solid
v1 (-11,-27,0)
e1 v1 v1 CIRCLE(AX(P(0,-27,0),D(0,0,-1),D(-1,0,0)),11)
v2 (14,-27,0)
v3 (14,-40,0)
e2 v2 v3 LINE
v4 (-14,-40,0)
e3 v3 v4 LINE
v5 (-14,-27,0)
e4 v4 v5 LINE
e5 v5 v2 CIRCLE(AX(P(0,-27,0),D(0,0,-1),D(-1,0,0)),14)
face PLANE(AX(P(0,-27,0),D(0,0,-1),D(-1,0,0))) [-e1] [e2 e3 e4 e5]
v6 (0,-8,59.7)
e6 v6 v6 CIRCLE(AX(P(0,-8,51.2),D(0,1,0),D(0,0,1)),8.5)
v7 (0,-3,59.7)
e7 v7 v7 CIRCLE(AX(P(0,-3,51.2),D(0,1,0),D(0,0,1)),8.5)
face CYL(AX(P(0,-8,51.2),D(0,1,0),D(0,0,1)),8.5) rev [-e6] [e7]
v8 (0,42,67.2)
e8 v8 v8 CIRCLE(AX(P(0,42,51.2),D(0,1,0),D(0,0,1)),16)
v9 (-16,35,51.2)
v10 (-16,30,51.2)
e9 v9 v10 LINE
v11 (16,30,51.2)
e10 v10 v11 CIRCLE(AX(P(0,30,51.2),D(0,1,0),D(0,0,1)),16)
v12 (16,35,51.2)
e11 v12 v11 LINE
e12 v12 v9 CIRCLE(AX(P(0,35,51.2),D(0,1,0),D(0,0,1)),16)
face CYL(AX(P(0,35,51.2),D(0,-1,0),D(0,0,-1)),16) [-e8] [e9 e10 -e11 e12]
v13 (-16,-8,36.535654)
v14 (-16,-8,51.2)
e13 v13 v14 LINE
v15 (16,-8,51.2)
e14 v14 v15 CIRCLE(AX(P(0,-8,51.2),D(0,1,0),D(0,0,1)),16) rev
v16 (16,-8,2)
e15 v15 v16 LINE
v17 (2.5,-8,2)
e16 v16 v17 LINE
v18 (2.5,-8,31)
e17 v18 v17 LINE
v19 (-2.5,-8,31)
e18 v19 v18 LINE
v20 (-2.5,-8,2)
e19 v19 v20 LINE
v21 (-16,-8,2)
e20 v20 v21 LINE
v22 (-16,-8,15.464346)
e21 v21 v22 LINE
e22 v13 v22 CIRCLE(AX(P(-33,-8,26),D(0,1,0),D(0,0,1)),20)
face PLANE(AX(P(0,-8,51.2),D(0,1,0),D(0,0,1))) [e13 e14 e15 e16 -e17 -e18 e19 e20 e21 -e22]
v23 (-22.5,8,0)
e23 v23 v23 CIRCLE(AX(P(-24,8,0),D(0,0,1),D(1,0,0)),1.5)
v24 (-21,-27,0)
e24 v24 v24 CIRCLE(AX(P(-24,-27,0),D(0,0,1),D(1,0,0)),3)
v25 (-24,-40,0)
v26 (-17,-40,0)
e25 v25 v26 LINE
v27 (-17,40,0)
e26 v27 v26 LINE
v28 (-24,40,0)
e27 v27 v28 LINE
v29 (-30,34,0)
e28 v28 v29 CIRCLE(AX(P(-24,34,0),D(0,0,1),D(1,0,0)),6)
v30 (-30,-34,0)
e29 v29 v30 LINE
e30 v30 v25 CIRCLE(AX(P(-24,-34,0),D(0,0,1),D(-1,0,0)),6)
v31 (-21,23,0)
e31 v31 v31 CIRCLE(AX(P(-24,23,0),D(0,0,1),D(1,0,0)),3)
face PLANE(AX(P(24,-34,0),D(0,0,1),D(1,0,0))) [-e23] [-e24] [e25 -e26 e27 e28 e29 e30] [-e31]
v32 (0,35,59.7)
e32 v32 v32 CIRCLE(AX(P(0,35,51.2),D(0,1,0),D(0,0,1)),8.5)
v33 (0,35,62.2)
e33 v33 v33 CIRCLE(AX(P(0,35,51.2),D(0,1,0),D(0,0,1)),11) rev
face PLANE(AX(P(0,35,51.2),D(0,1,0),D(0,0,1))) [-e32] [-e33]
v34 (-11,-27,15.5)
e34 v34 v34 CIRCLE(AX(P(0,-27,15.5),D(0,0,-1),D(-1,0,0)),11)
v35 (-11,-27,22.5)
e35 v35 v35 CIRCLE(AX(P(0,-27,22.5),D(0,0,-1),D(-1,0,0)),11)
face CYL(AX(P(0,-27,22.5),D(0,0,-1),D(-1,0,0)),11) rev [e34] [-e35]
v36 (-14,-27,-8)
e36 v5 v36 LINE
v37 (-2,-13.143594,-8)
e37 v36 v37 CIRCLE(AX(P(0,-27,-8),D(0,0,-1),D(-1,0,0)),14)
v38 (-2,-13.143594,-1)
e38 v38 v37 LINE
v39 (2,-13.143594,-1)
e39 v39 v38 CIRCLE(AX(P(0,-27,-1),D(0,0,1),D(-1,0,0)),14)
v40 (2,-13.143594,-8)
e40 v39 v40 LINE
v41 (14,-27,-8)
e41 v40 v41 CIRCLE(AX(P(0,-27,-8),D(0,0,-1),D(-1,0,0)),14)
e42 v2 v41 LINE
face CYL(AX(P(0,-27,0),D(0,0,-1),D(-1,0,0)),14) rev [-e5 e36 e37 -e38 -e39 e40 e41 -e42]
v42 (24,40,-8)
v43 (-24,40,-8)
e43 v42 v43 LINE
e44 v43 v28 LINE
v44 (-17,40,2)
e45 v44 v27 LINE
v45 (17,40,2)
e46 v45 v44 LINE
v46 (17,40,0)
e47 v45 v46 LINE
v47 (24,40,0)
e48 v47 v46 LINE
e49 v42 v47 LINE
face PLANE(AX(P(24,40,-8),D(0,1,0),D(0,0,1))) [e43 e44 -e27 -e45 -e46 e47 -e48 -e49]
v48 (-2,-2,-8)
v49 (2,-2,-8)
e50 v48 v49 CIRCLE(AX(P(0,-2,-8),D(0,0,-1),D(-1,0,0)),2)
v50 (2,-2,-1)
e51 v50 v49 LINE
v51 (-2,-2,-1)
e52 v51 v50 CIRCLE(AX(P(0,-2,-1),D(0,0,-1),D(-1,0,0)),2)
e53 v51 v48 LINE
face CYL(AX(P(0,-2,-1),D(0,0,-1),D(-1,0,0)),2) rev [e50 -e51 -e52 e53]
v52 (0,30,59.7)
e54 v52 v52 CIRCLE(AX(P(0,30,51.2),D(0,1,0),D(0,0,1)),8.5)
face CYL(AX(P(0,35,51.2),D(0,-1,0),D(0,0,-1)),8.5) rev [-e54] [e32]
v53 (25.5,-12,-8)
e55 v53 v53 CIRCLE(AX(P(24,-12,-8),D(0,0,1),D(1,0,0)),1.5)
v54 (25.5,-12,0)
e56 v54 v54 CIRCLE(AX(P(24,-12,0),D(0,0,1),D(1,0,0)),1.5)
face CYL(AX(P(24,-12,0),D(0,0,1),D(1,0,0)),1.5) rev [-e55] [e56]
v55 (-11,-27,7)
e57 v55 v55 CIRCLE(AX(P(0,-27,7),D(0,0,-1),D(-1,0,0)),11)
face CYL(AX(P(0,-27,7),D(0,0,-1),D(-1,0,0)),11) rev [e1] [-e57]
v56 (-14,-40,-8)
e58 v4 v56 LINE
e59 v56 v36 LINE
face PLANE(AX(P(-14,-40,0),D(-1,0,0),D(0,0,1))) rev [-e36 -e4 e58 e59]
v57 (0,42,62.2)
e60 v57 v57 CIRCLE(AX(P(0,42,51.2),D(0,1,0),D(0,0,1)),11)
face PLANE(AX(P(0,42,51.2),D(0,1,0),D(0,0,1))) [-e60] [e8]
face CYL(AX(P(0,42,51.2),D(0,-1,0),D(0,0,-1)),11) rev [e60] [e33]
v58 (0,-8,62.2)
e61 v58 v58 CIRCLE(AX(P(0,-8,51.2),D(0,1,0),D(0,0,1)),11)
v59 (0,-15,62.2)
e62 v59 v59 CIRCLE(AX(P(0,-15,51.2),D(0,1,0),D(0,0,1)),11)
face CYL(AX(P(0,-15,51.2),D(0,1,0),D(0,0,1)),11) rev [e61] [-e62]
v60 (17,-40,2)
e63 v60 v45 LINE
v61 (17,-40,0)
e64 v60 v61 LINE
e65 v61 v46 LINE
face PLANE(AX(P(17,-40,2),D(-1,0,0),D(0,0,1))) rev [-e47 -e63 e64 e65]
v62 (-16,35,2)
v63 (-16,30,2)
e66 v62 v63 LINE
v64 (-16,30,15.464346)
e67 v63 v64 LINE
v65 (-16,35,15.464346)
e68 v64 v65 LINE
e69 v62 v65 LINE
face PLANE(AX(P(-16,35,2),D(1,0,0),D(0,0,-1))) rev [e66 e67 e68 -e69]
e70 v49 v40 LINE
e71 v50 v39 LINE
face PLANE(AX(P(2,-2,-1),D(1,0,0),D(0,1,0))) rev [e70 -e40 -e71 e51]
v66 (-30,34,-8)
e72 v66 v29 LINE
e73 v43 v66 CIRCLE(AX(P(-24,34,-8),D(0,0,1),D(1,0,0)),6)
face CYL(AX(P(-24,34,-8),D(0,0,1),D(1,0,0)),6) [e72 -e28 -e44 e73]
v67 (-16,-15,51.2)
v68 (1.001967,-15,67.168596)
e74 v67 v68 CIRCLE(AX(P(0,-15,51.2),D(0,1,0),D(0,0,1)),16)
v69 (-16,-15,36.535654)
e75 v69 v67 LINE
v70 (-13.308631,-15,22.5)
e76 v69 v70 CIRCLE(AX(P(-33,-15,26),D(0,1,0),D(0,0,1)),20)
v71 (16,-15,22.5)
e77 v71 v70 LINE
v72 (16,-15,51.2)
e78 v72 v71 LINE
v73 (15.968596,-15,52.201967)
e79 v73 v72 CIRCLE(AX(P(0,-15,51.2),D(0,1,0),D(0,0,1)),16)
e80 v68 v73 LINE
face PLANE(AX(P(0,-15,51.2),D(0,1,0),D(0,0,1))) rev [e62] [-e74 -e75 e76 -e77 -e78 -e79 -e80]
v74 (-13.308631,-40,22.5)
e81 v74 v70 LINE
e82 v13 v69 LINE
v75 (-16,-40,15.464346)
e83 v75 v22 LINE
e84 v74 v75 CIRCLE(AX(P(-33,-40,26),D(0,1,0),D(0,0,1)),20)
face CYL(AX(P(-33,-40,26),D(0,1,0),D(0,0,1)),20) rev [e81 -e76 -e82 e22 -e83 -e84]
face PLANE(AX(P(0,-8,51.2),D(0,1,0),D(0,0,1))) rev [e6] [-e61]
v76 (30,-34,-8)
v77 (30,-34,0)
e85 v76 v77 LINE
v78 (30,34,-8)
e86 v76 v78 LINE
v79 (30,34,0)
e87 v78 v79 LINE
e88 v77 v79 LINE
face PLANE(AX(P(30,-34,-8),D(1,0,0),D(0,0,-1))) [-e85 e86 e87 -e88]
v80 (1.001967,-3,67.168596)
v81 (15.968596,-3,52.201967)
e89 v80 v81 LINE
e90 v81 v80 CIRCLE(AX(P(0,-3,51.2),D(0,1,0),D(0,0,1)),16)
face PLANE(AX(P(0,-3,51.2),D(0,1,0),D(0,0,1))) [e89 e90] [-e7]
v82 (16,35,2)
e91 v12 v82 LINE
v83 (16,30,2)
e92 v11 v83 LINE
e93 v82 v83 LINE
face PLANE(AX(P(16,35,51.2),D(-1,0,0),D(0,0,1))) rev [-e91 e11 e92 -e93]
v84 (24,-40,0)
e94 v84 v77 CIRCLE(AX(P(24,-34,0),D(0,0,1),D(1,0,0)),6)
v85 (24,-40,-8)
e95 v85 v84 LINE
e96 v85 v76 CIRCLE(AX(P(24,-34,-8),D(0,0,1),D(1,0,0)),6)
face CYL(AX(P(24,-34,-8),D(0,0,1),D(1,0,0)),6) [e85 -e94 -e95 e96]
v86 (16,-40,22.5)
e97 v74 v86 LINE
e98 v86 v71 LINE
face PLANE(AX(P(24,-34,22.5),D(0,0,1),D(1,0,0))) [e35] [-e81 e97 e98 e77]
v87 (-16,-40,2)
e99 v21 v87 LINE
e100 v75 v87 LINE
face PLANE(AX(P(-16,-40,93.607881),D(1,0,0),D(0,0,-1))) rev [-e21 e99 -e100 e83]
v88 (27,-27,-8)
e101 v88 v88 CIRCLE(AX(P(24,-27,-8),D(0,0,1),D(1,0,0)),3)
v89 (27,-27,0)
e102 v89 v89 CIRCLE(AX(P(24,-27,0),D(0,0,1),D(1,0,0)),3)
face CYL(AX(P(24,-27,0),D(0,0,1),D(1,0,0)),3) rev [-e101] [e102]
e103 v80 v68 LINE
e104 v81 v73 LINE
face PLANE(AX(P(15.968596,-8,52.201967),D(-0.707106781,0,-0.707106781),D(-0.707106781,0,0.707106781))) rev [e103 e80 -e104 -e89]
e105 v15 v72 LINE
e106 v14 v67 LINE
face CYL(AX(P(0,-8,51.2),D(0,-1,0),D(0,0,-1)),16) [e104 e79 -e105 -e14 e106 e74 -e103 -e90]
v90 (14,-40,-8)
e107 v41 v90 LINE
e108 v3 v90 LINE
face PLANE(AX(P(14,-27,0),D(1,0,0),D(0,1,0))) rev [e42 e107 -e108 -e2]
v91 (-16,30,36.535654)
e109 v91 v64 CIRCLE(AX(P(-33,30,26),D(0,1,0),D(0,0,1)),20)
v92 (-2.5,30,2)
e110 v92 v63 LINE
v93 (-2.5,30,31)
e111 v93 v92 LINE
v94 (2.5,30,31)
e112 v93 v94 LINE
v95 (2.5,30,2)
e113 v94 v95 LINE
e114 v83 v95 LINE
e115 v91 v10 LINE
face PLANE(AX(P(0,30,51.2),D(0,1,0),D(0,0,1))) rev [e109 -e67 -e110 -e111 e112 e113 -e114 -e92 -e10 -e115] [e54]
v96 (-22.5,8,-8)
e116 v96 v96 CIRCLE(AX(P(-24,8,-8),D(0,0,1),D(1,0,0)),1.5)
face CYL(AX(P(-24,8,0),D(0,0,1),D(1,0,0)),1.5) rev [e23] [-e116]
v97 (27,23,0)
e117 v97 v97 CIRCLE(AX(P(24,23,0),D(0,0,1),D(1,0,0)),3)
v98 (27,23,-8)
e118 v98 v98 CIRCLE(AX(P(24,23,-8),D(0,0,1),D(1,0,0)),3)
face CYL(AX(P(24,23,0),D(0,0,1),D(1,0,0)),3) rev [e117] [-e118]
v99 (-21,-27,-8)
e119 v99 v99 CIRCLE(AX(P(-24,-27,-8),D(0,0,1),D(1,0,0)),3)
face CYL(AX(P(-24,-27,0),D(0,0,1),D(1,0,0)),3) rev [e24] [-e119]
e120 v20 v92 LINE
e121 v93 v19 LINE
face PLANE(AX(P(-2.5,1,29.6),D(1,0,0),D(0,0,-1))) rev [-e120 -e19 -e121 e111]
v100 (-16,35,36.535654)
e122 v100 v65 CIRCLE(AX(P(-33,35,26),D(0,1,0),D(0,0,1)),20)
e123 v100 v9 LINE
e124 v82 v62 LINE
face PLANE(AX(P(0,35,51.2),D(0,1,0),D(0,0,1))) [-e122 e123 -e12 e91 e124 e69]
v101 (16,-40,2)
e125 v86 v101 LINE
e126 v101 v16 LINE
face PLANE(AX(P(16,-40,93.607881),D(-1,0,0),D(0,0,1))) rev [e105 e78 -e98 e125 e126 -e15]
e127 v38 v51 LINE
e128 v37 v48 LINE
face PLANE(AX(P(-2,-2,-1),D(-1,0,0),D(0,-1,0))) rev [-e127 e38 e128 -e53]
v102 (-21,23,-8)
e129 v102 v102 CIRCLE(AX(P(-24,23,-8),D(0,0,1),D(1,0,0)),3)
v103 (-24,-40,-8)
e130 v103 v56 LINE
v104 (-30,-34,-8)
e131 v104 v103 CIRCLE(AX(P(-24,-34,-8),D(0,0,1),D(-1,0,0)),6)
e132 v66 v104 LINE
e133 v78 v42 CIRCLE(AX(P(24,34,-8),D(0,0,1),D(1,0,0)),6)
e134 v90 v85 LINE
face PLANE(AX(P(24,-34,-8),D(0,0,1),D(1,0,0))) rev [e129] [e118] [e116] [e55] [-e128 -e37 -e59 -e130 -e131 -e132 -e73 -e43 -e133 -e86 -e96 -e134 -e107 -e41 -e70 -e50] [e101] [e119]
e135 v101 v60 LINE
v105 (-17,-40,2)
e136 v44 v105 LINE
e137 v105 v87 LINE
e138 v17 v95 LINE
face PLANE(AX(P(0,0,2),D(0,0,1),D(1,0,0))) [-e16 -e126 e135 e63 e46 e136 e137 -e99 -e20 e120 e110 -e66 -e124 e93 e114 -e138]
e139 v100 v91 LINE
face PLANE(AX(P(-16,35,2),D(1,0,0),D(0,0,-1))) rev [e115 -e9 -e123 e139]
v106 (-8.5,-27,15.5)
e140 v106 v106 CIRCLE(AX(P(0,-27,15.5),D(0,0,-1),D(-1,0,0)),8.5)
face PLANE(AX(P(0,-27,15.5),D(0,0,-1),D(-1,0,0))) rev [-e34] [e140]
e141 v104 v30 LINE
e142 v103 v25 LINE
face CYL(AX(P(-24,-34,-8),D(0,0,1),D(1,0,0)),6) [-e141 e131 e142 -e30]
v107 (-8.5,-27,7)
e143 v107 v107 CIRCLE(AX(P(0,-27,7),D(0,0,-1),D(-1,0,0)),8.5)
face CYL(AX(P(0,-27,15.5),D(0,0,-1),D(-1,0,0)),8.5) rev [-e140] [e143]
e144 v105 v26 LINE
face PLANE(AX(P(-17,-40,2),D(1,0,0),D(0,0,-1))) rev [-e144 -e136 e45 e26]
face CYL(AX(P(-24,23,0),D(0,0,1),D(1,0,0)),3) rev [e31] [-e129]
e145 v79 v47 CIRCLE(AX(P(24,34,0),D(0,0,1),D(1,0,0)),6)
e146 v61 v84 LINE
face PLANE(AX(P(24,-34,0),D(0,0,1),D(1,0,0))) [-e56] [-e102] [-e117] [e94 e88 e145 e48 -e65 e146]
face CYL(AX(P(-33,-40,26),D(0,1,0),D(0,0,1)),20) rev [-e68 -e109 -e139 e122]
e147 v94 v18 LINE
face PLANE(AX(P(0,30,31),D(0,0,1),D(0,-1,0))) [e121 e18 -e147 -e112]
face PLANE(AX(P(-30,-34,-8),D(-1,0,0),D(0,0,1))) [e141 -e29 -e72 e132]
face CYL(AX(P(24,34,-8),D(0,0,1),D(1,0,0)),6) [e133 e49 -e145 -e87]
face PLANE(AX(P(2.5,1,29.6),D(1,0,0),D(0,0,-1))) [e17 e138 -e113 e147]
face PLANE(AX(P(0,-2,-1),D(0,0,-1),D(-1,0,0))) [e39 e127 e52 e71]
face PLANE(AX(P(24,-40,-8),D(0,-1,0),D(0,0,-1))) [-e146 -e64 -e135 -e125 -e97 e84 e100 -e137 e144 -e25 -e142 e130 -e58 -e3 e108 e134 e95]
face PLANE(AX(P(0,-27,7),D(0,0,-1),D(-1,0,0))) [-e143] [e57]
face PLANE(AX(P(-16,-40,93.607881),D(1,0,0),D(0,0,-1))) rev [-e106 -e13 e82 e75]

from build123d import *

# Parameters (mm, degrees)
EXTRUDE_1_DEPTH           = 8
SKETCH_3_W                = 34
SKETCH_3_H                = 80
EXTRUDE_2_DEPTH           = 2
CUT_EXTRUDE_1_DEPTH       = 8
CUT_EXTRUDE_2_DEPTH       = 7
SKETCH_6_W                = 32
SKETCH_6_H                = 25
EXTRUDE_4_DEPTH           = 20.5
SKETCH_7_R                = 11
CUT_EXTRUDE_5_DEPTH       = 7
SKETCH_8_R                = 8.5
CUT_EXTRUDE_6_DEPTH       = 8.5
SKETCH_9_R                = 11
CUT_EXTRUDE_7_DEPTH       = 7
EXTRUDE_5_DEPTH           = 7
EXTRUDE_6_DEPTH           = 5
SKETCH_13_R               = 8.5
CUT_EXTRUDE_8_DEPTH       = 5
SKETCH_14_R               = 11
CUT_EXTRUDE_9_DEPTH       = 7
SKETCH_15_R               = 8.5
EXTRUDE_7_DEPTH           = 5
SKETCH_16_R               = 16
SKETCH_16_R_2             = 11
EXTRUDE_8_DEPTH           = 7
F_6_0MM_START             = -8
F_6_0MM_1_OUTLINE_R       = 3
F_6_0MM_1_DEPTH           = 8
F_3_0MM_1_D               = 3
RIB_13_REACH              = 86.734
SKETCH_21_WALL_W          = 209.467873062
SKETCH_21_WALL_H          = 5
CUT_EXTRUDE_10_DEPTH      = 102.56692375
CUT_EXTRUDE_10_DEPTH_BACK = 102.56692375
SKETCH_23_R               = 20


# Read off the part's stored shape, not the designer's step: Ø6.0mm 暗销孔1
with BuildPart() as part:
    # 草图1 → 凸台-拉伸1 (new body)
    with BuildSketch(Plane.XY):
        with BuildLine():
            Line((24, -40), (-24, -40))
            ThreePointArc((-24, -40), (-28.242640687, -38.242640687), (-30, -34))
            Line((-30, -34), (-30, 34))
            ThreePointArc((-30, 34), (-28.242640687, 38.242640687), (-24, 40))
            Line((-24, 40), (24, 40))
            ThreePointArc((24, 40), (28.242640687, 38.242640687), (30, 34))
            Line((30, 34), (30, -34))
            ThreePointArc((30, -34), (28.242640687, -38.242640687), (24, -40))
        make_face()
    extrude(amount=-EXTRUDE_1_DEPTH)

    # 草图3 → 凸台-拉伸2 (add)
    with BuildSketch(Plane.XY):
        Rectangle(SKETCH_3_W, SKETCH_3_H)
    extrude(amount=EXTRUDE_2_DEPTH)

    # 草图4 → 切除-拉伸1 (cut)
    with BuildSketch(Plane(origin=(0, 0, -8), x_dir=(-1, 0, 0), z_dir=(0, 0, -1))):
        with BuildLine():
            Line((-14, -27), (-14, -40))
            Line((-14, -40), (14, -40))
            Line((14, -40), (14, -27))
            ThreePointArc((14, -27), (0, -13), (-14, -27))
        make_face()
    extrude(amount=-CUT_EXTRUDE_1_DEPTH, mode=Mode.SUBTRACT)

    # 草图5 → 切除-拉伸2 (cut)
    with BuildSketch(Plane(origin=(0, 0, -8), x_dir=(-1, 0, 0), z_dir=(0, 0, -1))):
        with BuildLine():
            Line((-2, -2), (-2, -13.143593539))
            ThreePointArc((-2, -13.143593539), (0, -13), (2, -13.143593539))
            Line((2, -13.143593539), (2, -2))
            ThreePointArc((2, -2), (0, 0), (-2, -2))
        make_face()
    extrude(amount=-CUT_EXTRUDE_2_DEPTH, mode=Mode.SUBTRACT)

    # 草图6 → 凸台-拉伸4 (add)
    with BuildSketch(Plane.XY.offset(2)):
        with Locations((0, -27.5)):
            Rectangle(SKETCH_6_W, SKETCH_6_H)
    extrude(amount=EXTRUDE_4_DEPTH)

    # 草图7 → 切除-拉伸5 (cut)
    with BuildSketch(Plane(origin=(0, 0, 0), x_dir=(-1, 0, 0), z_dir=(0, 0, -1))):
        with Locations((0, -27)):
            Circle(SKETCH_7_R)
    extrude(amount=-CUT_EXTRUDE_5_DEPTH, mode=Mode.SUBTRACT)

    # 草图8 → 切除-拉伸6 (cut)
    with BuildSketch(Plane(origin=(0, 0, 7), x_dir=(-1, 0, 0), z_dir=(0, 0, -1))):
        with Locations((0, -27)):
            Circle(SKETCH_8_R)
    extrude(amount=-CUT_EXTRUDE_6_DEPTH, mode=Mode.SUBTRACT)

    # 草图9 → 切除-拉伸7 (cut)
    with BuildSketch(Plane(origin=(0, 0, 15.5), x_dir=(-1, 0, 0), z_dir=(0, 0, -1))):
        with Locations((0, -27)):
            Circle(SKETCH_9_R)
    extrude(amount=-CUT_EXTRUDE_7_DEPTH, mode=Mode.SUBTRACT)

    # 草图11 → 凸台-拉伸5 (add)
    with BuildSketch(Plane(origin=(0, -15, 0), x_dir=(1, 0, 0), z_dir=(0, 1, 0))):
        with BuildLine():
            Line((-16, -2), (16, -2))
            Line((16, -2), (16, -51.2))
            ThreePointArc((16, -51.2), (15.99214711, -51.701229307), (15.968596148, -52.201966601))
            Line((15.968596148, -52.201966601), (1.001966601, -67.168596148))
            ThreePointArc((1.001966601, -67.168596148), (-10.953733026, -62.862578309), (-16, -51.2))
            Line((-16, -51.2), (-16, -2))
        make_face()
    extrude(amount=EXTRUDE_5_DEPTH)

    # 草图12 → 凸台-拉伸6 (add)
    with BuildSketch(Plane(origin=(0, -8, 0), x_dir=(1, 0, 0), z_dir=(0, 1, 0))):
        with BuildLine():
            Line((1.001966601, -67.168596148), (15.968596148, -52.201966601))
            ThreePointArc((15.968596148, -52.201966601), (-11.313708499, -39.886291501), (1.001966601, -67.168596148))
        make_face()
    extrude(amount=EXTRUDE_6_DEPTH)

    # 草图13 → 切除-拉伸8 (cut)
    with BuildSketch(Plane(origin=(0, -3, 0), x_dir=(1, 0, 0), z_dir=(0, 1, 0))):
        with Locations(Location((0, -51.2, 0), (0, 0, 270))):
            Circle(SKETCH_13_R)
    extrude(amount=-CUT_EXTRUDE_8_DEPTH, mode=Mode.SUBTRACT)

    # 草图14 → 切除-拉伸9 (cut)
    with BuildSketch(Plane(origin=(0, -8, 0), x_dir=(1, 0, 0), z_dir=(0, 1, 0))):
        with Locations(Location((0, -51.2, 0), (0, 0, 270))):
            Circle(SKETCH_14_R)
    extrude(amount=-CUT_EXTRUDE_9_DEPTH, mode=Mode.SUBTRACT)

    # 草图15 → 凸台-拉伸7 (add)
    with BuildSketch(Plane(origin=(0, 30, 0), x_dir=(1, 0, 0), z_dir=(0, 1, 0))):
        with BuildLine():
            Line((-16, -2), (16, -2))
            Line((16, -2), (16, -51.2))
            ThreePointArc((16, -51.2), (0, -67.2), (-16, -51.2))
            Line((-16, -51.2), (-16, -2))
        make_face()
        with Locations(Location((0, -51.2, 0), (0, 0, 270))):
            Circle(SKETCH_15_R, mode=Mode.SUBTRACT)
    extrude(amount=EXTRUDE_7_DEPTH)

    # 草图16 → 凸台-拉伸8 (add)
    with BuildSketch(Plane(origin=(0, 35, 0), x_dir=(1, 0, 0), z_dir=(0, 1, 0))):
        with Locations((0, -51.2)):
            Circle(SKETCH_16_R)
        with Locations(Location((0, -51.2, 0), (0, 0, 270))):
            Circle(SKETCH_16_R_2, mode=Mode.SUBTRACT)
    extrude(amount=EXTRUDE_8_DEPTH)

    # Ø6.0mm 暗销孔1 outline → Ø6.0mm 暗销孔1 (cut)
    with BuildSketch(Plane.XY.offset(F_6_0MM_START)):
        with Locations((-24, -27)):
            Circle(F_6_0MM_1_OUTLINE_R)
        with Locations((24, 23)):
            Circle(F_6_0MM_1_OUTLINE_R)
        with Locations((24, -27)):
            Circle(F_6_0MM_1_OUTLINE_R)
        with Locations((-24, 23)):
            Circle(F_6_0MM_1_OUTLINE_R)
    extrude(amount=F_6_0MM_1_DEPTH, mode=Mode.SUBTRACT)

    # Ø3.0mm 暗销孔1 (through all)
    with Locations(Plane.XY):
        with Locations((24, -12), (-24, 8)):
            Hole(F_3_0MM_1_D / 2)

    # 草图21 wall → 筋13 (add, up to next)
    with BuildSketch(Plane(origin=(0, 11, 31), x_dir=(0, -1, 0), z_dir=(0, 0, -1)), mode=Mode.PRIVATE) as rib_13_sk1:
        Rectangle(SKETCH_21_WALL_W, SKETCH_21_WALL_H)
    rib_13_tool1 = extrude(rib_13_sk1.sketch, amount=RIB_13_REACH, mode=Mode.PRIVATE) - part.part
    add(rib_13_tool1.solids().sort_by_distance((0, 11, 31))[0])

    # 草图23 → 切除-拉伸10 (cut, two sides: drawn at the far end of the back side and taken through both)
    with BuildSketch(Plane(origin=(0, 30, 0), x_dir=(1, 0, 0), z_dir=(0, 1, 0)).offset(-CUT_EXTRUDE_10_DEPTH_BACK)):
        with Locations((-33, -26)):
            Circle(SKETCH_23_R)
    extrude(amount=CUT_EXTRUDE_10_DEPTH + CUT_EXTRUDE_10_DEPTH_BACK, mode=Mode.SUBTRACT)


solid = part.part
